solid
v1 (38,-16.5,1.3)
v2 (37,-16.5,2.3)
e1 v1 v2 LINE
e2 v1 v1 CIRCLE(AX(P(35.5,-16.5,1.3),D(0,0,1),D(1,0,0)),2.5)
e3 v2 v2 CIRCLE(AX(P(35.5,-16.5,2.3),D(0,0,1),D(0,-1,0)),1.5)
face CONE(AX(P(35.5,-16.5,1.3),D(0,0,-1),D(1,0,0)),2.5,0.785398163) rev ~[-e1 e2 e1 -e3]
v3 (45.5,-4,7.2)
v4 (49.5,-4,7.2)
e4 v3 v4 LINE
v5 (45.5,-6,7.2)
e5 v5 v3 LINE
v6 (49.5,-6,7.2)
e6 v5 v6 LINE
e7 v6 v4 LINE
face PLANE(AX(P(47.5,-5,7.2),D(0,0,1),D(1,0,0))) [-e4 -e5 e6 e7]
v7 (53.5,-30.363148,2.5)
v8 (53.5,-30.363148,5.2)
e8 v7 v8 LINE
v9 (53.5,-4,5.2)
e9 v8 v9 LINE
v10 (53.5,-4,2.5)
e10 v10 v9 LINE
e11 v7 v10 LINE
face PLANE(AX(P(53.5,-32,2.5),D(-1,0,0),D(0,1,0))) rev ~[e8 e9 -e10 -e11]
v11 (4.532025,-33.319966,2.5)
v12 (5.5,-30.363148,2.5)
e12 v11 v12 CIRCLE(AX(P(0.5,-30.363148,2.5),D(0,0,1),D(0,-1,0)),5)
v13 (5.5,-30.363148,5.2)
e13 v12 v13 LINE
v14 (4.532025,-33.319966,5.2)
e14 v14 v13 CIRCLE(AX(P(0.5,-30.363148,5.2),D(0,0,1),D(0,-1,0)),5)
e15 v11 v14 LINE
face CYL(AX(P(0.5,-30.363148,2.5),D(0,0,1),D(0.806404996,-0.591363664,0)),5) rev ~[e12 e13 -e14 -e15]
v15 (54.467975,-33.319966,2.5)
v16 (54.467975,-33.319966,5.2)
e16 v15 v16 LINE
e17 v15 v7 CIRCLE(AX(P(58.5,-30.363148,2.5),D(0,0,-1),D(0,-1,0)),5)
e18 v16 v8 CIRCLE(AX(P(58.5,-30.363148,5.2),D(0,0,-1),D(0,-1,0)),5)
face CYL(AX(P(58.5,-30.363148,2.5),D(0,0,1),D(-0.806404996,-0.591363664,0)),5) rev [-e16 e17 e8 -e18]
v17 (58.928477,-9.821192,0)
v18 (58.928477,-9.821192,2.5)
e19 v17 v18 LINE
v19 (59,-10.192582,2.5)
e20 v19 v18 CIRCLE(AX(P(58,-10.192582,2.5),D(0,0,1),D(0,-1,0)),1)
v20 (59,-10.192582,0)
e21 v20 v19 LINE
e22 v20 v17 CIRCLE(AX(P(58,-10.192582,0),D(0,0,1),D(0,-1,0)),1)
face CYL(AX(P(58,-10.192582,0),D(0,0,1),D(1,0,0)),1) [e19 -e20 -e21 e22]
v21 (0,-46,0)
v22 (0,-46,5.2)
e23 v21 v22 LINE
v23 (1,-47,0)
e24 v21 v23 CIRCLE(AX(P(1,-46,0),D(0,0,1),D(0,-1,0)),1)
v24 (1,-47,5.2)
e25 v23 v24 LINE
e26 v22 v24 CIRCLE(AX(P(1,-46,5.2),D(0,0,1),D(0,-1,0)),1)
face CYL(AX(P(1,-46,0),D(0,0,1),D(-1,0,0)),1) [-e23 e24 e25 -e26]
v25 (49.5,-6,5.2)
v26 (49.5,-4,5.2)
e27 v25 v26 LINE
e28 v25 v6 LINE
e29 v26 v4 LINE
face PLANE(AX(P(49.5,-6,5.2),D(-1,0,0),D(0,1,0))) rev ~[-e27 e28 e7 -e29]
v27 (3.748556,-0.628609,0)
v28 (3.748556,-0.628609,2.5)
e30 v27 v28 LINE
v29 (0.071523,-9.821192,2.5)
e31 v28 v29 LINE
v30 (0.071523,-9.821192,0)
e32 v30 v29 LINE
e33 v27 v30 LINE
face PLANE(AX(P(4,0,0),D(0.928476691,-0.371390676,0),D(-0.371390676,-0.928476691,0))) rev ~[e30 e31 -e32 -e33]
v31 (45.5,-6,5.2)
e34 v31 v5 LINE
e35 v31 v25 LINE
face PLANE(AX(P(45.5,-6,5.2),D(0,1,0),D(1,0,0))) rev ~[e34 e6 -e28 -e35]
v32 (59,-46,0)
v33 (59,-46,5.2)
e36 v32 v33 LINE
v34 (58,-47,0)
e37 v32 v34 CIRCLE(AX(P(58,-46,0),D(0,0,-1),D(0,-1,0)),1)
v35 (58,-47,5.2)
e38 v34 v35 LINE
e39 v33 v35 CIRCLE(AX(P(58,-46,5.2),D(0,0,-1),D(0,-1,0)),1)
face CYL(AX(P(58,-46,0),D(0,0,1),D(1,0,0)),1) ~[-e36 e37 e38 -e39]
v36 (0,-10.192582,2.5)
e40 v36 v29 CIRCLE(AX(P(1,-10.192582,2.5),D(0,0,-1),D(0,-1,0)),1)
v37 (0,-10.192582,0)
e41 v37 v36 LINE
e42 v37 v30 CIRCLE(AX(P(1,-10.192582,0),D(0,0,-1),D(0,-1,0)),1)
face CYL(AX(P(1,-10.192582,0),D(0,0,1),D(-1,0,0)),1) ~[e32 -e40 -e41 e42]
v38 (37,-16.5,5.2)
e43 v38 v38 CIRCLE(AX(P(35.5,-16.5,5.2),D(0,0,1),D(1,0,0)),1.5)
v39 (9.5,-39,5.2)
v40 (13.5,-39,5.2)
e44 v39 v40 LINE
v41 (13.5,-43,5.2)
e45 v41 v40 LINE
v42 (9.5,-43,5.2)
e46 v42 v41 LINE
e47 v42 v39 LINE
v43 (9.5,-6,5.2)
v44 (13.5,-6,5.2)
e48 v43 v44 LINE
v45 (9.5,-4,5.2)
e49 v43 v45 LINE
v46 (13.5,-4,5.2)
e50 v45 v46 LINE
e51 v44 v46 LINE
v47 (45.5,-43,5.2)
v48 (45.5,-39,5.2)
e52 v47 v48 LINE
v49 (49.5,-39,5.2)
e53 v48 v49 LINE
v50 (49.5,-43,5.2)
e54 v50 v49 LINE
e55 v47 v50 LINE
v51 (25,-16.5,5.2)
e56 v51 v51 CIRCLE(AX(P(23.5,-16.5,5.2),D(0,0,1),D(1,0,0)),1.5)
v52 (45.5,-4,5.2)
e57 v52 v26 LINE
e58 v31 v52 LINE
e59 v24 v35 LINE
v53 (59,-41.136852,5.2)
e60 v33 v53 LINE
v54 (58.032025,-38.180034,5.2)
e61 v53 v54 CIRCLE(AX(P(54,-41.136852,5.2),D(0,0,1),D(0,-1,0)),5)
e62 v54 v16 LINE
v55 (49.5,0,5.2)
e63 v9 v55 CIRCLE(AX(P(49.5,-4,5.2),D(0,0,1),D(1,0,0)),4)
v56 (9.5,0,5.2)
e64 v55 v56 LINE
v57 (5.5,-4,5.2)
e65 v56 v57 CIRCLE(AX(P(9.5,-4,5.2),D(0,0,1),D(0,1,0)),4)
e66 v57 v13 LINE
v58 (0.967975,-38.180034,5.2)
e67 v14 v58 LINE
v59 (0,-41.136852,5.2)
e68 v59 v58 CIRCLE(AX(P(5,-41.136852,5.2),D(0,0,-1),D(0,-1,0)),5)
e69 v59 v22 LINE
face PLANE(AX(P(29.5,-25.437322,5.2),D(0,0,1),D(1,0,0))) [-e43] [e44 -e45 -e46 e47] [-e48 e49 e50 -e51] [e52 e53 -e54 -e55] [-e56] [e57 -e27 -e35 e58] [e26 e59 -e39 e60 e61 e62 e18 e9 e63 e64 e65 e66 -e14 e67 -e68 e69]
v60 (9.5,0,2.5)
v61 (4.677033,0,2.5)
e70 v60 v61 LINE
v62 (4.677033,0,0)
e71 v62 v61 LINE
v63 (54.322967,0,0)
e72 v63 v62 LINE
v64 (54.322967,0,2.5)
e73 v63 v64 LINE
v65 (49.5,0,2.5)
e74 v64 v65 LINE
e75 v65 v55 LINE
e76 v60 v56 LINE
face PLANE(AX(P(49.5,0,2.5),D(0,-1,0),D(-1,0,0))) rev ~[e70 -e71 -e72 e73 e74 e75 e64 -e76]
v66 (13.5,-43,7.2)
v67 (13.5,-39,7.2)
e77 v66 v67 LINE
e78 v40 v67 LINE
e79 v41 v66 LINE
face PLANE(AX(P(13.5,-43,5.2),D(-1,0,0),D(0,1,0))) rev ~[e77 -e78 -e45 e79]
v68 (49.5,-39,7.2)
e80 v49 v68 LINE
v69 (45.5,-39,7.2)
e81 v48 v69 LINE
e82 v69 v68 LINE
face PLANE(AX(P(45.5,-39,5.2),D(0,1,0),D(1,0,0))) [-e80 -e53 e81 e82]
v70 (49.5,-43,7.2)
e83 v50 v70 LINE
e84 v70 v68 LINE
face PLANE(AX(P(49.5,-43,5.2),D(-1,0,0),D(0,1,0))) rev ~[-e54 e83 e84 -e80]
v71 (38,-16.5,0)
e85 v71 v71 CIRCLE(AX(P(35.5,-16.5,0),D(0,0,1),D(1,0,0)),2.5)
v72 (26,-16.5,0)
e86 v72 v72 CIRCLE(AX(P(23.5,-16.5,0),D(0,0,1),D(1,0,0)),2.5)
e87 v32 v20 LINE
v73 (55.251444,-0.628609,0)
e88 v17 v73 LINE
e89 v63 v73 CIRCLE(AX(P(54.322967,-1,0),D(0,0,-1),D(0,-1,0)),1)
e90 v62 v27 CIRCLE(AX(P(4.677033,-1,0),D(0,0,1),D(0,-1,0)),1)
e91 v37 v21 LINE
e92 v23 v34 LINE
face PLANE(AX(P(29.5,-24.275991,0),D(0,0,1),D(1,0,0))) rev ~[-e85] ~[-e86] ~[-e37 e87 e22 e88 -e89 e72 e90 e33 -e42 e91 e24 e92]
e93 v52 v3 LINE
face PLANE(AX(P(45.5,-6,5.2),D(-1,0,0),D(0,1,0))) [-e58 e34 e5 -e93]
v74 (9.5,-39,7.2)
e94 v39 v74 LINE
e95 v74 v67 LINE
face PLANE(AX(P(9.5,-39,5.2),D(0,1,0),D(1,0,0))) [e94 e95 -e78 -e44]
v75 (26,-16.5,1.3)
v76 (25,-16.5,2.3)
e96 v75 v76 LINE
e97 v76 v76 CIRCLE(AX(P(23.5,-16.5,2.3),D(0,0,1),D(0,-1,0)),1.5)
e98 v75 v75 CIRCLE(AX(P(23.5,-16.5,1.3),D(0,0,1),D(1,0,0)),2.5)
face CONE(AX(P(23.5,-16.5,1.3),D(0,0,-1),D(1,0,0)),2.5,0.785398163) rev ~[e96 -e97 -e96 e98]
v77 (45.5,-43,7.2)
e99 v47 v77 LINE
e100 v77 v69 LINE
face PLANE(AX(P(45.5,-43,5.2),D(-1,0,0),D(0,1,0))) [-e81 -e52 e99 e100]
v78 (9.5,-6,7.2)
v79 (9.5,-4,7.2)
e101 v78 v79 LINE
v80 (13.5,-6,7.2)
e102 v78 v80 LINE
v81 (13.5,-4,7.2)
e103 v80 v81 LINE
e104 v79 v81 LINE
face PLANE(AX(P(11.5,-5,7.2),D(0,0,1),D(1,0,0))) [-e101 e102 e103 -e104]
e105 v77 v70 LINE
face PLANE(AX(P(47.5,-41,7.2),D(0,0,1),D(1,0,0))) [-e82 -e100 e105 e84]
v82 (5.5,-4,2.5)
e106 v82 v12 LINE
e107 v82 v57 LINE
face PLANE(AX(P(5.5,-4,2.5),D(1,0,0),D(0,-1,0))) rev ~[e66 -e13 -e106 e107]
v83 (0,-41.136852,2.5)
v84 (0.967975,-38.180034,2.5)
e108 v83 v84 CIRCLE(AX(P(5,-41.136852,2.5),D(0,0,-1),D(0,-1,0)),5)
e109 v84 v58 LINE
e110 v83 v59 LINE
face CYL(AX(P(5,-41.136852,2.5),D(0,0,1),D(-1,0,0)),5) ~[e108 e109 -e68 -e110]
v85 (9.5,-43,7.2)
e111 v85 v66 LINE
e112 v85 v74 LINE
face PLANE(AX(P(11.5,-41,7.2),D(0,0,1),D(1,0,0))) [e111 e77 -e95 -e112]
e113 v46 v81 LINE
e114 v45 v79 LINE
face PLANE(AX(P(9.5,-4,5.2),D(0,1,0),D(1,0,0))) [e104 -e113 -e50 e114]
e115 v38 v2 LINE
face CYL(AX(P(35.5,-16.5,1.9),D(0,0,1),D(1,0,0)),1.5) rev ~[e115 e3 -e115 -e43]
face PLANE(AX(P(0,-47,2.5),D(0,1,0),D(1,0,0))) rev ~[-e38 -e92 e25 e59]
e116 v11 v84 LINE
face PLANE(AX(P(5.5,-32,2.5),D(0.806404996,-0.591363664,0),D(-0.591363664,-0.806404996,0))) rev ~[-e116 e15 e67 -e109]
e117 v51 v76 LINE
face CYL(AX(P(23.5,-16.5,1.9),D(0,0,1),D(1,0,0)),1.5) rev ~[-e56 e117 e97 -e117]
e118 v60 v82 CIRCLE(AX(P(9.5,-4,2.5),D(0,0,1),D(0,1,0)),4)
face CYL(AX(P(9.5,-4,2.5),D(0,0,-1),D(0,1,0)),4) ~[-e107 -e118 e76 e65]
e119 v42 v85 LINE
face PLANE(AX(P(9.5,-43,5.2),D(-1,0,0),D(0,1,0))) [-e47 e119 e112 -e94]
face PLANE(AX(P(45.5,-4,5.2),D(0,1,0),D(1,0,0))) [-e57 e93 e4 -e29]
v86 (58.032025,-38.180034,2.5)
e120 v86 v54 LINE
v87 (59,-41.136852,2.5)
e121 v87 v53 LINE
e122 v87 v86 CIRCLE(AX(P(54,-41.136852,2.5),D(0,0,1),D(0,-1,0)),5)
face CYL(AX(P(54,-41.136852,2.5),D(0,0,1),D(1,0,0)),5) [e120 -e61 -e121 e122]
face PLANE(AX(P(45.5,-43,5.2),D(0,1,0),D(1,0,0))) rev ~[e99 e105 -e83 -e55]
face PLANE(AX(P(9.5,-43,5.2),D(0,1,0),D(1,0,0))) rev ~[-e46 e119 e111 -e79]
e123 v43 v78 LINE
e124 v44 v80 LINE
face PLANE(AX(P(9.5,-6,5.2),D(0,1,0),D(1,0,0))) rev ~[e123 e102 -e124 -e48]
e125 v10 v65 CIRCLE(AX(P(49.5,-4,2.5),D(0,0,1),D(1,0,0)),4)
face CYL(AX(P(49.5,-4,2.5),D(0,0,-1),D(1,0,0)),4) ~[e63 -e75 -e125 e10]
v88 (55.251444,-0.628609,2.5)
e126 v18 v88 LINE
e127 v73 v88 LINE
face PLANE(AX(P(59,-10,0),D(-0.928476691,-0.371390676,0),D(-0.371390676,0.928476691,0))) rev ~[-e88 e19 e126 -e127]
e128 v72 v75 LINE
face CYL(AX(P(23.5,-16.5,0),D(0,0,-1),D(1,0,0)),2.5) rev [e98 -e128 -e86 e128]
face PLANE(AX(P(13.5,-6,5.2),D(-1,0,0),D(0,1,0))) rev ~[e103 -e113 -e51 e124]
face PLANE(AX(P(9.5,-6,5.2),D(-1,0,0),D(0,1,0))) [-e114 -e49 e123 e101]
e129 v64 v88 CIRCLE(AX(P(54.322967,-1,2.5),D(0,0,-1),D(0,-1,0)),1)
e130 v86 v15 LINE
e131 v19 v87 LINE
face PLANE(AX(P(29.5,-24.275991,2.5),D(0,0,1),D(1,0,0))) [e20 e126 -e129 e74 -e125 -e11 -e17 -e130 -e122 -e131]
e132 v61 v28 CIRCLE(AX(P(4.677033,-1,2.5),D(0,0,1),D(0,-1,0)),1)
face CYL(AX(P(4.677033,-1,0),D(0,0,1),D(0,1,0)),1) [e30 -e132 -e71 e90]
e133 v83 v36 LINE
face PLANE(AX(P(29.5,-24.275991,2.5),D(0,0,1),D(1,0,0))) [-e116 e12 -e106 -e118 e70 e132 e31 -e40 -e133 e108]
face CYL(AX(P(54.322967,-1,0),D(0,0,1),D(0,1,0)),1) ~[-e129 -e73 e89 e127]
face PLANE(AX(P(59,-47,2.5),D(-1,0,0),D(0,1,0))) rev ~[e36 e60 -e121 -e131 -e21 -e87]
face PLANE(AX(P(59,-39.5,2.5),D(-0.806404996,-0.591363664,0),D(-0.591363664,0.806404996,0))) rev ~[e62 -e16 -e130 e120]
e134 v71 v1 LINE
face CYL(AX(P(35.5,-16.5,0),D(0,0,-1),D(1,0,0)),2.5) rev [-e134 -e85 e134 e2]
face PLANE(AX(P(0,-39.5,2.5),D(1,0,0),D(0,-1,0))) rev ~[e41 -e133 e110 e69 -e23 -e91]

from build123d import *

# Parameters (mm, degrees)
F1_DEPTH      = 2.5
F3_DEPTH      = 2.7
F4_R          = 1
F5_R          = 5
F6_W          = 4
F6_H          = 2
F6_H_2        = 4
F7_DEPTH      = 2
F8_R          = 1.5
F9_DEPTH      = 6
F10_R         = 2.5
F11_DEPTH     = 2.5
F12_S5_R      = 1.5
F12_T6_DEPTH  = 5
F12_S11_R     = 1.5
F12_T12_DEPTH = 5


# Not quite as in the source:
# - a fillet or chamfer that OpenCascade refuses, or shapes differently, is made with other operations: its cross-section is extruded or revolved along the edge and cut away or added


with BuildPart() as f1:
    # F0 (on Top) → F1 (new body)
    with BuildSketch(Plane.XY):
        Polygon((55, 0), (4, 0), (0, -10), (0, -47), (59, -47), (59, -10), align=None)
    extrude(amount=F1_DEPTH)

    # F2 (on face) → F3 (join)
    with BuildSketch(Plane.XY.offset(2.5)):
        with BuildLine():
            Line((0, -39.5), (0, -47))
            Line((0, -47), (59, -47))
            Line((59, -47), (59, -39.5))
            Line((59, -39.5), (53.5, -32))
            Line((53.5, -32), (53.5, -4))
            ThreePointArc((53.5, -4), (52.3284271247, -1.1715728753), (49.5, 0))
            Line((49.5, 0), (9.5, 0))
            ThreePointArc((9.5, 0), (6.6715728753, -1.1715728753), (5.5, -4))
            Line((5.5, -4), (5.5, -32))
            Line((5.5, -32), (0, -39.5))
        make_face()
    extrude(amount=F3_DEPTH)

    # F4
    f4_edges = [f1.edges().sort_by_distance(p)[0] for p in [
        (0, -47, 2.6),
        (59, -47, 2.6),
        (4, 0, 1.25),
        (55, 0, 1.25),
        (59, -10, 1.25),
        (0, -10, 1.25),
    ]]
    fillet(f4_edges, radius=F4_R)

    # F5
    f5_edges = [f1.edges().sort_by_distance(p)[0] for p in [
        (0, -39.5, 3.85),
        (59, -39.5, 3.85),
        (53.5, -32, 3.85),
        (5.5, -32, 3.85),
    ]]
    fillet(f5_edges, radius=F5_R)

    # F6 (on face) → F7 (join)
    with BuildSketch(Plane.XY.offset(5.2)):
        with Locations((11.5, -5)):
            Rectangle(F6_W, F6_H)
        with Locations((11.5, -41)):
            Rectangle(F6_W, F6_H_2)
        with Locations((47.5, -5)):
            Rectangle(F6_W, F6_H)
        with Locations((47.5, -41)):
            Rectangle(F6_W, F6_H_2)
    extrude(amount=F7_DEPTH)

    # F8 (on face) → F9 (cut)
    with BuildSketch(Plane.XY.offset(5.2)):
        with Locations((23.5, -16.5)):
            Circle(F8_R)
        with Locations((35.5, -16.5)):
            Circle(F8_R)
    extrude(amount=-F9_DEPTH, mode=Mode.SUBTRACT)

    # F10 (on face) → F11 (cut)
    with BuildSketch(Plane.XY):
        with Locations((35.5, -16.5)):
            Circle(F10_R)
        with Locations((23.5, -16.5)):
            Circle(F10_R)
    extrude(amount=F11_DEPTH, mode=Mode.SUBTRACT)

    # F12: chamfer of 1.2 on 2 edges, made by hand


with BuildPart() as f12_tool2:
    # F12_s3 → F12_t4 (revolve)
    with BuildSketch(Plane.XZ.offset(16.5)):
        Polygon((38, 1.3), (36.8, 2.5), (38, 2.5), align=None)
    revolve(axis=Axis((35.5, -16.5, 2.5), (0, 0, 1)))

    # F12_s5 → F12_t6 (cut, symmetric)
    with BuildSketch(Plane.XY.offset(1.9)):
        with Locations((35.5, -16.5)):
            Circle(F12_S5_R)
    extrude(amount=F12_T6_DEPTH, both=True, mode=Mode.SUBTRACT)


with BuildPart() as f1_1:
    add(f1.part)

    # F12_t1: union F12_tool2
    add(f12_tool2.part)


with BuildPart() as f12_tool8:
    # F12_s9 → F12_t10 (revolve)
    with BuildSketch(Plane.XZ.offset(16.5)):
        Polygon((26, 1.3), (24.8, 2.5), (26, 2.5), align=None)
    revolve(axis=Axis((23.5, -16.5, 2.5), (0, 0, 1)))

    # F12_s11 → F12_t12 (cut, symmetric)
    with BuildSketch(Plane.XY.offset(1.9)):
        with Locations((23.5, -16.5)):
            Circle(F12_S11_R)
    extrude(amount=F12_T12_DEPTH, both=True, mode=Mode.SUBTRACT)


with BuildPart() as f1_2:
    add(f1_1.part)

    # F12_t7: union F12_tool8
    add(f12_tool8.part)


solid = f1_2.part
